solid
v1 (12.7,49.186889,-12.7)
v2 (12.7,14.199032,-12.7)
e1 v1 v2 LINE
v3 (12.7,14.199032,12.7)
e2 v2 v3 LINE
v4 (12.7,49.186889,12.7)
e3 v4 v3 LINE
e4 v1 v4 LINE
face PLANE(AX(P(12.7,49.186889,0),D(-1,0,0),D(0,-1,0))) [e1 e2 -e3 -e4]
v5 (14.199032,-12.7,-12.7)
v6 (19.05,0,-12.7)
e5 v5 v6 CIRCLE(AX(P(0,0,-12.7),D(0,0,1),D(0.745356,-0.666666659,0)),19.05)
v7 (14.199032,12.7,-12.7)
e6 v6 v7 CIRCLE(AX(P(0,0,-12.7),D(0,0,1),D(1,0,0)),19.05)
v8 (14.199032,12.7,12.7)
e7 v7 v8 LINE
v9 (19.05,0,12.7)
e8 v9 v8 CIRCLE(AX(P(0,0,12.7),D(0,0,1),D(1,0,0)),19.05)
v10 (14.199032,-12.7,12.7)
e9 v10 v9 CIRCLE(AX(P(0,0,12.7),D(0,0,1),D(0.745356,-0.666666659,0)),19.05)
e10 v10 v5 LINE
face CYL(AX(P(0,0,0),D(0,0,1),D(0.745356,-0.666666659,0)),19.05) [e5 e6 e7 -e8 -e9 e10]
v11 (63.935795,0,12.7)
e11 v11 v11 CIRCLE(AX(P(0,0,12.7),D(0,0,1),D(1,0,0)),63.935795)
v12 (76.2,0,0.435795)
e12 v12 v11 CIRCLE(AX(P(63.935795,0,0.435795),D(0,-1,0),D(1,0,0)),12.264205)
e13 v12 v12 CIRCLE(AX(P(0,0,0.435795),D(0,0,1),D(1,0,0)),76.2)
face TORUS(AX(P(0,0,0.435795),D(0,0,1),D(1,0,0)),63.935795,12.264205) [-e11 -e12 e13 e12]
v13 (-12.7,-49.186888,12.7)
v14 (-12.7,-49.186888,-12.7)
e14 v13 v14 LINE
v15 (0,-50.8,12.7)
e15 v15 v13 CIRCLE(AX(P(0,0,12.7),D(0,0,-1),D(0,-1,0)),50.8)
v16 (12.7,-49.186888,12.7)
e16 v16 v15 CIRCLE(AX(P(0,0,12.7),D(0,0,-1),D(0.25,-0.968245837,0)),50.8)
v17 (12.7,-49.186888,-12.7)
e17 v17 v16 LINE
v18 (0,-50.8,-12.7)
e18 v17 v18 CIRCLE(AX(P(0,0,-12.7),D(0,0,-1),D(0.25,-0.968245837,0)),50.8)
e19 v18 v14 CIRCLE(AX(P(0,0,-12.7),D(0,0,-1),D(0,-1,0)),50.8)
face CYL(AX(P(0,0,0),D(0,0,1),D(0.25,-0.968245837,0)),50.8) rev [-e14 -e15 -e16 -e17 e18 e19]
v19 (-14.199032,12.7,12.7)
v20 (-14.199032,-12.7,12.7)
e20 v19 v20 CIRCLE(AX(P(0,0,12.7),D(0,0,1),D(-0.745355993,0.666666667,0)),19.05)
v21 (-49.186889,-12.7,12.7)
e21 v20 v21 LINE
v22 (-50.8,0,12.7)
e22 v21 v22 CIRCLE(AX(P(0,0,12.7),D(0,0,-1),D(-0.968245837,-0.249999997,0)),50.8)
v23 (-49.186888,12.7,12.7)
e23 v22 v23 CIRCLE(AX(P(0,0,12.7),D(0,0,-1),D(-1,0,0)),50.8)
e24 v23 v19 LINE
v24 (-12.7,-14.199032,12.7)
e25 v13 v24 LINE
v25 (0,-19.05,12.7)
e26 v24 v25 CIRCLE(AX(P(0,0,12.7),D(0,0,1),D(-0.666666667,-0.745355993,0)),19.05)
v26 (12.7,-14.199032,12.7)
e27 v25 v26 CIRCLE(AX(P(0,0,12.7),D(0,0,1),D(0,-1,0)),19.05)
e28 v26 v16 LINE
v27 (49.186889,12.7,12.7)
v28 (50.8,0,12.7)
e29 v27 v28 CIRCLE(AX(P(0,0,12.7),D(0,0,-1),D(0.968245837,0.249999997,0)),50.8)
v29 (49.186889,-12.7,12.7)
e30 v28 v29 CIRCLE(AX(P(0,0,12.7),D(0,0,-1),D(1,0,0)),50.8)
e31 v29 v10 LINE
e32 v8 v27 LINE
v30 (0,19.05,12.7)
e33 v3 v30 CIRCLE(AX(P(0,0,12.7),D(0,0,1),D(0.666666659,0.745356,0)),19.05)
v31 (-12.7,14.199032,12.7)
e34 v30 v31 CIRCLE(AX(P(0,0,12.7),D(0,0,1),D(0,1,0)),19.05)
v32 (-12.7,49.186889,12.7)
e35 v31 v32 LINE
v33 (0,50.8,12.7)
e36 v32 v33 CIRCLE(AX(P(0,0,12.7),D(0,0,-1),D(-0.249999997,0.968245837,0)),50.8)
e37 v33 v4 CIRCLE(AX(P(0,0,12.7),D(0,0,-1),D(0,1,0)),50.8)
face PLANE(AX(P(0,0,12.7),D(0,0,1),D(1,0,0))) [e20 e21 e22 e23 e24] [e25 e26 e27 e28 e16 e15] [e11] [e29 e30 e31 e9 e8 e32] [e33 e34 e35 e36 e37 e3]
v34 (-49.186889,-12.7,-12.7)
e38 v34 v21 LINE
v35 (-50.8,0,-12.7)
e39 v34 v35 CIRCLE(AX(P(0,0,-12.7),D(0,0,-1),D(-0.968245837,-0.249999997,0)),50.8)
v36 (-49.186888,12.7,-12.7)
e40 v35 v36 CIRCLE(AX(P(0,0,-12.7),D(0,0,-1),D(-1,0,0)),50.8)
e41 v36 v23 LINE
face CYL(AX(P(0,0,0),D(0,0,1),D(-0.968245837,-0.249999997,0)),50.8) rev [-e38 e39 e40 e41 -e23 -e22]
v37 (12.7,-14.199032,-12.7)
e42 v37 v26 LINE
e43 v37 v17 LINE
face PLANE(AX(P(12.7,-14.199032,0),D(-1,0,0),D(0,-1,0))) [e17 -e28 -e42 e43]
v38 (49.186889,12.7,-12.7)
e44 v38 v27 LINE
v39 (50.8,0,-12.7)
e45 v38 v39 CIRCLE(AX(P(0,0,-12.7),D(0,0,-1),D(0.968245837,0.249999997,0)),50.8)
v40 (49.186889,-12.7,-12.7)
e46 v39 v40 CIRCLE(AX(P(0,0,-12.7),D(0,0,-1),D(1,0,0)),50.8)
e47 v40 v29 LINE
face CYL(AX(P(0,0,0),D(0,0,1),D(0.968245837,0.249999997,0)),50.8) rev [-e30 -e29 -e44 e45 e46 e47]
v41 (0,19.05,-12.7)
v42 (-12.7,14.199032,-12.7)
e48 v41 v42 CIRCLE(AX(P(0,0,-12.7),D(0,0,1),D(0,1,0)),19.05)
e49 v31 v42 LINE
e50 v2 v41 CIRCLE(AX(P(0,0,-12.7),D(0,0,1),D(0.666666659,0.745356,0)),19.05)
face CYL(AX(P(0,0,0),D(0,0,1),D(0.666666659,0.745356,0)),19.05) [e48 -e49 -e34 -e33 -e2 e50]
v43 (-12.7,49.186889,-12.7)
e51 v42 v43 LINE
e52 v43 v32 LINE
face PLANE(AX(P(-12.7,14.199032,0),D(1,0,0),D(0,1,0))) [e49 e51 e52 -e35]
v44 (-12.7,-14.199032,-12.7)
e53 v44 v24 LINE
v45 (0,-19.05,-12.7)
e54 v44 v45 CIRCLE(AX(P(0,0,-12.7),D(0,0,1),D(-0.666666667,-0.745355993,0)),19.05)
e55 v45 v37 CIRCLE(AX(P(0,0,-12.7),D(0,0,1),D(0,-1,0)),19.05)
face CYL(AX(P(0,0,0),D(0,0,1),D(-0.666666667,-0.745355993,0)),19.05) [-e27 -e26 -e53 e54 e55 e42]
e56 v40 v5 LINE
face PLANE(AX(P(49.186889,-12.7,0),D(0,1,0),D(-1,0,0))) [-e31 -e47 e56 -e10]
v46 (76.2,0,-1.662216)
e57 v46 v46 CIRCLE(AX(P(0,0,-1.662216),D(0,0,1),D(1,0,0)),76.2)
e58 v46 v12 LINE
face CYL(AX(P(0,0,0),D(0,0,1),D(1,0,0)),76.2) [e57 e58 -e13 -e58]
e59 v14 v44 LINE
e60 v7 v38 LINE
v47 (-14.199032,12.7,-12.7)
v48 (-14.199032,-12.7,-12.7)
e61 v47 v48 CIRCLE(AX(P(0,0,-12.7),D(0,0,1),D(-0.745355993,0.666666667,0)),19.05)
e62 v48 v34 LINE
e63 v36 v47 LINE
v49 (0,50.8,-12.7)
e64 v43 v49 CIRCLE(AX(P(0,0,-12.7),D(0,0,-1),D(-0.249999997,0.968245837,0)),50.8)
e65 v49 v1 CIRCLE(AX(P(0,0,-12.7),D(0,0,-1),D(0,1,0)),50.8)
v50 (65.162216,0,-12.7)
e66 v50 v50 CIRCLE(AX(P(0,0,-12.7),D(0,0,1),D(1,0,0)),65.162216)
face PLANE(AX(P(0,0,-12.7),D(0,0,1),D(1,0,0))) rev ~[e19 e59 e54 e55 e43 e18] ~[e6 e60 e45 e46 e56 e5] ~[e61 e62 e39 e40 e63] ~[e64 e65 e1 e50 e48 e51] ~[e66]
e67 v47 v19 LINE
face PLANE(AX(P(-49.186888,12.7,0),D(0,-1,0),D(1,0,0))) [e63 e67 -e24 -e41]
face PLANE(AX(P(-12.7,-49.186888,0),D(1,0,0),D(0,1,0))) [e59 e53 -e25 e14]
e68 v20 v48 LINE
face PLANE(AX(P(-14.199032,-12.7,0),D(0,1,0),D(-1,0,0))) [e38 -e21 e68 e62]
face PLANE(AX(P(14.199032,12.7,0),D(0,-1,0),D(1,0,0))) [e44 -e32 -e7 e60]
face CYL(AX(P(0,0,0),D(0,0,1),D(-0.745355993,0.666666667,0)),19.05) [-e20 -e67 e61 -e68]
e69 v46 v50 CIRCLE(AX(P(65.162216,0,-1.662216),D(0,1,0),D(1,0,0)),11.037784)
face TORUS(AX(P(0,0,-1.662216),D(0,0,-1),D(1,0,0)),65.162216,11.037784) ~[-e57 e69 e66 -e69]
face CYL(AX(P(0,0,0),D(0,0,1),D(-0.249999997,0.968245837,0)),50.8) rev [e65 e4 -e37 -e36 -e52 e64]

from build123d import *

# Parameters (mm, degrees)
F0_R     = 76.2
F1_DEPTH = 12.7
F2_R     = 12.2642048969
F3_R     = 11.0377844072


# Not quite as in the source:
# - ends of sketch curves that miss each other by under 0.0002 mm in the source are joined
# - a feature names something its author has since deleted; it is built from what else it names


with BuildPart() as f1:
    # F0 (on Top) → F1 (new body, symmetric)
    with BuildSketch(Plane.XY):
        Circle(F0_R)
        with BuildLine():
            ThreePointArc((49.1868885365, 12.6999998465), (50.3951085804, 6.4010179795), (50.8, 0))
            ThreePointArc((50.8, 0), (50.3951085804, -6.4010179795), (49.1868885365, -12.6999998465))
            ThreePointArc((49.1868885365, -12.6999998465), (35.9210245403, -35.9210244282), (12.7, -49.1868884968))
            ThreePointArc((12.7, -49.1868884968), (6.4010180581, -50.3951085704), (0, -50.8))
            ThreePointArc((0, -50.8), (-6.4010180581, -50.3951085704), (-12.7, -49.1868884968))
            ThreePointArc((-12.7, -49.1868884968), (-35.9210245403, -35.9210244282), (-49.1868885365, -12.6999998465))
            ThreePointArc((-49.1868885365, -12.6999998465), (-50.3951085804, -6.4010179795), (-50.8, 0))
            ThreePointArc((-50.8, 0), (-50.3951085704, 6.4010180581), (-49.1868884968, 12.7))
            ThreePointArc((-49.1868884968, 12.7), (-35.9210244282, 35.9210245403), (-12.6999998465, 49.1868885365))
            ThreePointArc((-12.6999998465, 49.1868885365), (-6.4010179795, 50.3951085804), (0, 50.8))
            ThreePointArc((0, 50.8), (6.4010179795, 50.3951085804), (12.6999998465, 49.1868885365))
            ThreePointArc((12.6999998465, 49.1868885365), (35.9210244843, 35.9210244843), (49.1868885365, 12.6999998465))
        make_face(mode=Mode.SUBTRACT)
        with BuildLine():
            ThreePointArc((12.7, -49.1868884968), (35.9210245403, -35.9210244282), (49.1868885365, -12.6999998465))
            Line((49.1868885365, -12.6999998465), (14.1990317944, -12.6999998465))
            Line((14.1990317944, -12.6999998465), (12.7, -12.6999998465))
            Line((12.7, -12.6999998465), (12.7, -14.1990316571))
            Line((12.7, -14.1990316571), (12.7, -49.1868884968))
        make_face()
        with BuildLine():
            ThreePointArc((-49.1868885365, -12.6999998465), (-35.9210245403, -35.9210244282), (-12.7, -49.1868884968))
            Line((-12.7, -49.1868884968), (-12.7, -14.1990316571))
            Line((-12.7, -14.1990316571), (-12.7, -12.6999998465))
            Line((-12.7, -12.6999998465), (-14.1990317944, -12.6999998465))
            Line((-14.1990317944, -12.6999998465), (-49.1868885365, -12.6999998465))
        make_face()
        with BuildLine():
            Line((-12.6999998465, 14.1990317944), (-12.6999998465, 49.1868885365))
            ThreePointArc((-12.6999998465, 49.1868885365), (-35.9210244282, 35.9210245403), (-49.1868884968, 12.7))
            Line((-49.1868884968, 12.7), (-14.1990316571, 12.7))
            Line((-14.1990316571, 12.7), (-12.6999998465, 12.7))
            Line((-12.6999998465, 12.7), (-12.6999998465, 14.1990317944))
        make_face()
        with BuildLine():
            Line((14.1990317944, 12.6999998465), (49.1868885365, 12.6999998465))
            ThreePointArc((49.1868885365, 12.6999998465), (35.9210244843, 35.9210244843), (12.6999998465, 49.1868885365))
            Line((12.6999998465, 49.1868885365), (12.6999998465, 14.1990317944))
            Line((12.6999998465, 14.1990317944), (12.6999998465, 12.6999998465))
            Line((12.6999998465, 12.6999998465), (14.1990317944, 12.6999998465))
        make_face()
        Polygon((12.7, -12.6999998465), (12.7, 0), (12.6999998465, 12.6999998465), (0, 12.6999998465), (-12.6999998465, 12.7), (-12.7, 0), (-12.7, -12.6999998465), (0, -12.6999998465), align=None)
        with BuildLine():
            Line((-12.7, 0), (-12.6999998465, 12.7))
            Line((-12.6999998465, 12.7), (-14.1990316571, 12.7))
            ThreePointArc((-14.1990316571, 12.7), (-17.7959834382, 6.7974608102), (-19.05, 0))
            Line((-19.05, 0), (-12.7, 0))
        make_face()
        with BuildLine():
            ThreePointArc((14.1990317944, -12.6999998465), (17.795983475, -6.797460714), (19.05, 0))
            Line((19.05, 0), (12.7, 0))
            Line((12.7, 0), (12.7, -12.6999998465))
            Line((12.7, -12.6999998465), (14.1990317944, -12.6999998465))
        make_face()
        with BuildLine():
            Line((12.7, 0), (19.05, 0))
            ThreePointArc((19.05, 0), (17.795983475, 6.797460714), (14.1990317944, 12.6999998465))
            Line((14.1990317944, 12.6999998465), (12.6999998465, 12.6999998465))
            Line((12.6999998465, 12.6999998465), (12.7, 0))
        make_face()
        with BuildLine():
            ThreePointArc((0, -19.05), (6.7974608102, -17.7959834382), (12.7, -14.1990316571))
            Line((12.7, -14.1990316571), (12.7, -12.6999998465))
            Line((12.7, -12.6999998465), (0, -12.6999998465))
            Line((0, -12.6999998465), (0, -19.05))
        make_face()
        with BuildLine():
            ThreePointArc((-12.7, -14.1990316571), (-6.7974608102, -17.7959834382), (0, -19.05))
            Line((0, -19.05), (0, -12.6999998465))
            Line((0, -12.6999998465), (-12.7, -12.6999998465))
            Line((-12.7, -12.6999998465), (-12.7, -14.1990316571))
        make_face()
        with BuildLine():
            Line((-14.1990317944, -12.6999998465), (-12.7, -12.6999998465))
            Line((-12.7, -12.6999998465), (-12.7, 0))
            Line((-12.7, 0), (-19.05, 0))
            ThreePointArc((-19.05, 0), (-17.795983475, -6.797460714), (-14.1990317944, -12.6999998465))
        make_face()
        with BuildLine():
            Line((0, 12.6999998465), (0, 19.05))
            ThreePointArc((0, 19.05), (-6.797460714, 17.795983475), (-12.6999998465, 14.1990317944))
            Line((-12.6999998465, 14.1990317944), (-12.6999998465, 12.7))
            Line((-12.6999998465, 12.7), (0, 12.6999998465))
        make_face()
        with BuildLine():
            Line((12.6999998465, 12.6999998465), (12.6999998465, 14.1990317944))
            ThreePointArc((12.6999998465, 14.1990317944), (6.797460714, 17.795983475), (0, 19.05))
            Line((0, 19.05), (0, 12.6999998465))
            Line((0, 12.6999998465), (12.6999998465, 12.6999998465))
        make_face()
    extrude(amount=F1_DEPTH, both=True)

    # F2
    f2_edges = [f1.edges().sort_by_distance(p)[0] for p in [
        (-76.2, 0, 12.7),
    ]]
    fillet(f2_edges, radius=F2_R)

    # F3
    f3_edges = [f1.edges().sort_by_distance(p)[0] for p in [
        (-76.2, 0, -12.7),
    ]]
    fillet(f3_edges, radius=F3_R)


solid = f1.part
